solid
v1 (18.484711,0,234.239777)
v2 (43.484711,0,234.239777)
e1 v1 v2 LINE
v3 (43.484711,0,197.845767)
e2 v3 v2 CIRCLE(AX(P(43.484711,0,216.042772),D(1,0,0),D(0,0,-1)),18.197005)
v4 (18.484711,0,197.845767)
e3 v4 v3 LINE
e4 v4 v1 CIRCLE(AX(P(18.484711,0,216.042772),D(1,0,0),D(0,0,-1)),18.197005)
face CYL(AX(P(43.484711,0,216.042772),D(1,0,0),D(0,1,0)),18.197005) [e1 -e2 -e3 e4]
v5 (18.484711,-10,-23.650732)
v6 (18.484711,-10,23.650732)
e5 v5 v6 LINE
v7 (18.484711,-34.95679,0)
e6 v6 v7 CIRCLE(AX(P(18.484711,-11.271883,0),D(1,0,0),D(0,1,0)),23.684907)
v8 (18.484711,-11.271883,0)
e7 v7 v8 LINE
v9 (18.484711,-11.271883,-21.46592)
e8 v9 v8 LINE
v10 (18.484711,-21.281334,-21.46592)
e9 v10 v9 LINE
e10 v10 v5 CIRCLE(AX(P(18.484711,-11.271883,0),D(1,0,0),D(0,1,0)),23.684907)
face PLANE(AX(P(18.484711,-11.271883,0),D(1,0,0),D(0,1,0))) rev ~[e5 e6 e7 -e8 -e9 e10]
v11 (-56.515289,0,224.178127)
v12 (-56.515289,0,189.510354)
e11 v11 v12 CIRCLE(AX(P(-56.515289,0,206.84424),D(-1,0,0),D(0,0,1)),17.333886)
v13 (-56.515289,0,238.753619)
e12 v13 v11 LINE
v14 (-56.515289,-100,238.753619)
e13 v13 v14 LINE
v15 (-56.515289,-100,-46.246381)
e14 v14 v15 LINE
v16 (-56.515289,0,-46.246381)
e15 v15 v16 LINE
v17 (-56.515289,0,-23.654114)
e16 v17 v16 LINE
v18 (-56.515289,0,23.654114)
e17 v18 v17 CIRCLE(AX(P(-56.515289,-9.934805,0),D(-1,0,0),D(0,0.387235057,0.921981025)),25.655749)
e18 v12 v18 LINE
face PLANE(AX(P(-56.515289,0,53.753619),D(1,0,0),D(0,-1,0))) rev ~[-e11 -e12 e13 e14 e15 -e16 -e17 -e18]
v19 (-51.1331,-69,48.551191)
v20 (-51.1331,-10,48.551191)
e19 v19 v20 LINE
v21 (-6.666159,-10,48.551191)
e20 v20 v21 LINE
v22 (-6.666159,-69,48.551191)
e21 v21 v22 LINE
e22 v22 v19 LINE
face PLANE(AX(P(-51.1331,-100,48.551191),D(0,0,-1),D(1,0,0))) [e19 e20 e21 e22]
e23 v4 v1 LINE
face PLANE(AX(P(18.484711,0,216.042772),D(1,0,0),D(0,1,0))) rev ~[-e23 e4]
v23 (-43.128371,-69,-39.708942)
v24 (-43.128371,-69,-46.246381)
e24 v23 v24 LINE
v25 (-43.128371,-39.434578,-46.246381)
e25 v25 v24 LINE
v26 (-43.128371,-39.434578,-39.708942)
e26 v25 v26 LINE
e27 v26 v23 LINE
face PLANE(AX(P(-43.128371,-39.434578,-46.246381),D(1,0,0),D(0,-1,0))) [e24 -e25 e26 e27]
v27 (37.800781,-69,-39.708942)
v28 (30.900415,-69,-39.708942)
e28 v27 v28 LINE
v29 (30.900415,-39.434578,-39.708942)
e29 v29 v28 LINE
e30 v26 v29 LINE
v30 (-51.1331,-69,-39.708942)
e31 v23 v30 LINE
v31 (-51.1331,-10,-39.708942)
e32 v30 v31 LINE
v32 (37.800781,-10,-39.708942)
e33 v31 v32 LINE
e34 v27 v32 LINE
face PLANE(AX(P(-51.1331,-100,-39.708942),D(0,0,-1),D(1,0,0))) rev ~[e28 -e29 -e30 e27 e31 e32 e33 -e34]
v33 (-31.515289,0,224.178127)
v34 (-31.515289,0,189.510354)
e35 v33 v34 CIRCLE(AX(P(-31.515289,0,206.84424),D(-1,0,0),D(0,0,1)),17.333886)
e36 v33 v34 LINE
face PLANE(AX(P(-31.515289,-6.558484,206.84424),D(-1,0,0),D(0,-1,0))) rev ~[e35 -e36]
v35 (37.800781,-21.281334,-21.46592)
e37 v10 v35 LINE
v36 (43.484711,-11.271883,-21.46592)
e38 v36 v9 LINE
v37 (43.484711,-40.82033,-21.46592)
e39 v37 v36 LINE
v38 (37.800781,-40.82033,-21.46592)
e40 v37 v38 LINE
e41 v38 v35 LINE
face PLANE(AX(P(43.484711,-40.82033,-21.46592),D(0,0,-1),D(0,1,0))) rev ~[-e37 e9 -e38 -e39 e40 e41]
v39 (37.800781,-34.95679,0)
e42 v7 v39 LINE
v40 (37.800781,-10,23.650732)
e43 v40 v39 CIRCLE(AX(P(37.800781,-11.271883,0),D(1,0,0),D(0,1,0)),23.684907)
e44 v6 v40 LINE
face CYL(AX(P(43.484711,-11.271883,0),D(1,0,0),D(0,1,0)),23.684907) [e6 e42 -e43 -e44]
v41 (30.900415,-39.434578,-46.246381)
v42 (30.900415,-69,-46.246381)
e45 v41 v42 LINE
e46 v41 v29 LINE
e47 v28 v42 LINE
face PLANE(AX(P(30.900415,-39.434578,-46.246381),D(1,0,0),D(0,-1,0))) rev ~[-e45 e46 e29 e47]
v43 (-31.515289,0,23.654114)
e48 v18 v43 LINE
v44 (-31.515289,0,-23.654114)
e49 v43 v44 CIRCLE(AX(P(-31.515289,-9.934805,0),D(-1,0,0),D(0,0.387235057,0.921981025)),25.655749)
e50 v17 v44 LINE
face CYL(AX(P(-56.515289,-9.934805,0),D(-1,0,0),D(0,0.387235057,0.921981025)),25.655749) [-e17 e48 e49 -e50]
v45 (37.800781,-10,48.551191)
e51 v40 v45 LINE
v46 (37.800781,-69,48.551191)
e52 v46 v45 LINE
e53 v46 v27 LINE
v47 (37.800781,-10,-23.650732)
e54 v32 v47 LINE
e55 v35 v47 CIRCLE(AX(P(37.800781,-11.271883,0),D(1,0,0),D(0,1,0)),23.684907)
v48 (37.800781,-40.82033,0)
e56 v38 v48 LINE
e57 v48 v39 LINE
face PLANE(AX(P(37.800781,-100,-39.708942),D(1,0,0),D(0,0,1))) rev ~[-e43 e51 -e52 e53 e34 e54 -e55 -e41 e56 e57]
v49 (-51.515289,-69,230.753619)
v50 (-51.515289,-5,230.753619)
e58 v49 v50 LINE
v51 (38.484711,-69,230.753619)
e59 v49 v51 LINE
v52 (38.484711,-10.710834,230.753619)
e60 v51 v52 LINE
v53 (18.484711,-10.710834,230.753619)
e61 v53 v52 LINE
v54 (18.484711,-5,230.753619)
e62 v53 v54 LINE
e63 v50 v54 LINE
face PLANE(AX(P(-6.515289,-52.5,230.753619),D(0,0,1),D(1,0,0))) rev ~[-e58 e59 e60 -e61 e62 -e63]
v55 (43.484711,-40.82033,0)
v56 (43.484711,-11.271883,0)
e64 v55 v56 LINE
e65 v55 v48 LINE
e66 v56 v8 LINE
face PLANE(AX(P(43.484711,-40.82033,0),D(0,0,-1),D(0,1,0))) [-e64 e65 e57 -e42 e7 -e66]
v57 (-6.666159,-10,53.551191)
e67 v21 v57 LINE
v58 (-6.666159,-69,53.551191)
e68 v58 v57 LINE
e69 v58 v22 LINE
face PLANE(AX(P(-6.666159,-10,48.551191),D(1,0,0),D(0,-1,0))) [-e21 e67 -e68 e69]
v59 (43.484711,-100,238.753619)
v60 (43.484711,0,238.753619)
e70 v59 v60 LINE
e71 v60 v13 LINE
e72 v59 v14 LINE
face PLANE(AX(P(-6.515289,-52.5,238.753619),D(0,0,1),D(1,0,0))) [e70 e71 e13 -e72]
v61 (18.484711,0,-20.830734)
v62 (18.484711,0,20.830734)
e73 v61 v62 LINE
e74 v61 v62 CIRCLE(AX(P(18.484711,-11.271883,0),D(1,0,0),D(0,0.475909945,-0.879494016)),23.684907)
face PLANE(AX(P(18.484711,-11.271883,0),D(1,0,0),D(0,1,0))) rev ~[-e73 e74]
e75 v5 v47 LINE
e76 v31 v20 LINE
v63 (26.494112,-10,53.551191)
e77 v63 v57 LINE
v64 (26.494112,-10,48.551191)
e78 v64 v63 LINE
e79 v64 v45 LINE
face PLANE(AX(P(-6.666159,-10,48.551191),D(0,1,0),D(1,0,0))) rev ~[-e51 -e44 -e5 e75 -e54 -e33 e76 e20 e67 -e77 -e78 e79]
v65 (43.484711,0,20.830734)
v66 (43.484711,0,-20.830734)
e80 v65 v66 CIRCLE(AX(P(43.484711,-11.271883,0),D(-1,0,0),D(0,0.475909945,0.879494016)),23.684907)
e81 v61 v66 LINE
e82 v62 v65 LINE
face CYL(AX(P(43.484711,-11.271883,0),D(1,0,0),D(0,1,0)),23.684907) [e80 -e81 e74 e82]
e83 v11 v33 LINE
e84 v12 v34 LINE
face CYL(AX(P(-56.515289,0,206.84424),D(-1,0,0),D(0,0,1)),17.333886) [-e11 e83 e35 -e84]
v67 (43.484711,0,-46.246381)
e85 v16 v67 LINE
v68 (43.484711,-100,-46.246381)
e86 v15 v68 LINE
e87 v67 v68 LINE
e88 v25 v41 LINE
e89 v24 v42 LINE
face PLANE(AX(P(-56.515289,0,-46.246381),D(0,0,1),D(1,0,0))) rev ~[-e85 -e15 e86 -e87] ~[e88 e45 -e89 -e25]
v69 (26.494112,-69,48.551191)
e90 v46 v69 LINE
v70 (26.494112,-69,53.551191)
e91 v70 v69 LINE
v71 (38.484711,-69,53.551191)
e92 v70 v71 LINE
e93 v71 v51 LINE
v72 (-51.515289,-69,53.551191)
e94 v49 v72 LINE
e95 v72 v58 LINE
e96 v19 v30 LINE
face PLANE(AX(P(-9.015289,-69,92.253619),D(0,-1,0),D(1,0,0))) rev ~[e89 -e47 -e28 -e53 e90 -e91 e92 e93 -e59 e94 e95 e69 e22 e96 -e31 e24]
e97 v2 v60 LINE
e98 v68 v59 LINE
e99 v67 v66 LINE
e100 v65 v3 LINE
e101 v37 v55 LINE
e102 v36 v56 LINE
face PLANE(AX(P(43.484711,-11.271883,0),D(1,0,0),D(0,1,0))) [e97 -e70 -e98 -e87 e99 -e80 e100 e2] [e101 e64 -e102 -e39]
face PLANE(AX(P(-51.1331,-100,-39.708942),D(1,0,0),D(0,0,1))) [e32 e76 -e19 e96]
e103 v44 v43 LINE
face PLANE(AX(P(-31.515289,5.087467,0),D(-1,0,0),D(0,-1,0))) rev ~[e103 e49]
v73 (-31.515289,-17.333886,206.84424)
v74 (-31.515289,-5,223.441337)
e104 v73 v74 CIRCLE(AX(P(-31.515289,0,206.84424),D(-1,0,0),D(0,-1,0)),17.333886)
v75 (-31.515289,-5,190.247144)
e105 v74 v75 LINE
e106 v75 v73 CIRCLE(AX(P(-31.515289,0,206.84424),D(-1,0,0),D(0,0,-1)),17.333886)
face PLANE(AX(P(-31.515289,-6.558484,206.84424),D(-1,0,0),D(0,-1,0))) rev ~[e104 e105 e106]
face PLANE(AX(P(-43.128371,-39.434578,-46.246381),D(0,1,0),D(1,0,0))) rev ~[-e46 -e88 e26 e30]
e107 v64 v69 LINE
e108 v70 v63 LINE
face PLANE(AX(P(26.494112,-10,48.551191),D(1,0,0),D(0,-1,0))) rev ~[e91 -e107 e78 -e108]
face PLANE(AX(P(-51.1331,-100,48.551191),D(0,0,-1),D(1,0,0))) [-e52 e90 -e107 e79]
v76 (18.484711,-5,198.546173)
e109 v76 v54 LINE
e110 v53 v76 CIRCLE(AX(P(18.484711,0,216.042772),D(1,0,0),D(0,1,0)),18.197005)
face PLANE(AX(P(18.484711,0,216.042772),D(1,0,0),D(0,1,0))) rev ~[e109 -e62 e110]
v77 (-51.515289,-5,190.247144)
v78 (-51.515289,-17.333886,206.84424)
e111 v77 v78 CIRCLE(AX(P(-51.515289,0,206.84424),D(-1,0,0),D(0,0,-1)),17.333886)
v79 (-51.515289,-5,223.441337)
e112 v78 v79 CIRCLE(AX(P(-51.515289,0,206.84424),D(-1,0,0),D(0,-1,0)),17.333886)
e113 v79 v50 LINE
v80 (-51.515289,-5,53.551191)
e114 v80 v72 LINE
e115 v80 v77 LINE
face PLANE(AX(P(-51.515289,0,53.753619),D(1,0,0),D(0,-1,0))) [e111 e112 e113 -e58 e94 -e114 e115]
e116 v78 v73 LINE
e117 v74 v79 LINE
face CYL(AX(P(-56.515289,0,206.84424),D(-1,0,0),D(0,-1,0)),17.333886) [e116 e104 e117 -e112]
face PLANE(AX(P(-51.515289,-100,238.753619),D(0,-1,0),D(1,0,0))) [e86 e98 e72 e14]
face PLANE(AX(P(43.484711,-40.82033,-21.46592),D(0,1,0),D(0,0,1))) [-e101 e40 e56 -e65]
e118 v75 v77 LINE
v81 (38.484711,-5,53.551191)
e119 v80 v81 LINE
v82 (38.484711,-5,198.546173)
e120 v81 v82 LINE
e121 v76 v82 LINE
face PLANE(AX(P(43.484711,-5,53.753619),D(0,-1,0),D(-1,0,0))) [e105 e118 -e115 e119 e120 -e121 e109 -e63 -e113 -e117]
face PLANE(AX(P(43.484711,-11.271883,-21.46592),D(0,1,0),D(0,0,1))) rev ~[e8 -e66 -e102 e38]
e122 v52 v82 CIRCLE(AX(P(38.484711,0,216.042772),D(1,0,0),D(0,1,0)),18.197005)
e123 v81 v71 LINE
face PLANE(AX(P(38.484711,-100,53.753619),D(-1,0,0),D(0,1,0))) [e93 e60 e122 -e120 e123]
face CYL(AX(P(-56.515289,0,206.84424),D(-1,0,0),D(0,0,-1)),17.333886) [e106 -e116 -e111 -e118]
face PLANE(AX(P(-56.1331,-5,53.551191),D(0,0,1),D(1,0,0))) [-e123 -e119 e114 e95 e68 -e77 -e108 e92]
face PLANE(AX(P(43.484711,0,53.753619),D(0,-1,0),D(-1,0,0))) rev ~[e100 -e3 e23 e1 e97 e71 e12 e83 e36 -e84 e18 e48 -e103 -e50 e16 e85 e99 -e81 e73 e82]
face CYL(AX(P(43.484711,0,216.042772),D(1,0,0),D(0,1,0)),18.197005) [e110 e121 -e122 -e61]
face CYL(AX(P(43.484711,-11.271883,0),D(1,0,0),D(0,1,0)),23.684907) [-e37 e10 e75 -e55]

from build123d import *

# Parameters (mm, degrees)
F0_W        = 100
F0_H        = 100
F1_DEPTH    = 100
F2_W        = 88.9338813722
F2_H        = 88.2601328194
F3_DEPTH    = 90
F5_DEPTH    = 185
F6_T        = 5
F6_T3_DEPTH = 100
F6_T5_DEPTH = 98.2601328194
F6_T7_DEPTH = 98.9338813722
F7_W        = 90
F7_H        = 95
F8_DEPTH    = 8
F10_DEPTH   = 25
F11_R       = 23.6849070482
F11_R_2     = 18.1970048193
F12_DEPTH   = 25
F13_W       = 74.0287862718
F13_H       = 40.3192453086
F14_DEPTH   = 9
F15_W       = 33.1602711231
F15_H       = 63.8056004047
F16_DEPTH   = 25
F17_W       = 95
F17_H       = 277
F18_DEPTH   = 31
F19_W       = 29.5484475791
F19_H       = 21.4659199119
F20_DEPTH   = 25


# Not quite as in the source:
# - a shell that OpenCascade refuses in one call is made with other operations: the cavity is built on its own and cut out


with BuildPart() as f1:
    # F0 (on Front) → F1 (new body)
    with BuildSketch(Plane.XZ):
        with Locations((-6.5152887255, 3.7536189136)):
            Rectangle(F0_W, F0_H)
    extrude(amount=F1_DEPTH)

    # F2 (on face) → F3 (cut)
    with BuildSketch(Plane.XZ.offset(100)):
        with Locations((-6.6661592573, 4.4211242348)):
            Rectangle(F2_W, F2_H)
    extrude(amount=-F3_DEPTH, mode=Mode.SUBTRACT)

    # F4 (on face) → F5 (join)
    with BuildSketch(Plane.XY.offset(53.7536189136)):
        Polygon((-56.5152887255, -100), (43.4847112745, -100), (43.4847112745, -33.4126986563), (43.4847112745, 0), (-56.5152887255, 0), align=None)
    extrude(amount=F5_DEPTH)

    # F6: shell of thickness 5, made by hand


with BuildPart() as f6_core1:
    # F6_t2: copy of F1
    add(f1.part)

    # the walls: a layer under each face that stays
    f6_faces = [f6_core1.faces().sort_by_distance(p)[0] for p in [
        (43.4847112745, -50, 96.2536189136),
        (-6.5152887255, 0, 96.2536189136),
        (-56.5152887255, -50, 96.2536189136),
        (-51.1330999434, -55, 4.4211242348),
        (-6.6661592573, -10, 4.4211242348),
        (-6.6661592573, -55, -39.7089421749),
        (37.8007814288, -55, 4.4211242348),
        (-6.6661592573, -55, 48.5511906445),
        (-6.5152887255, -50, -46.2463810864),
    ]]
    thicken(f6_faces, amount=-F6_T, mode=Mode.SUBTRACT)

    # F6_s4 → F6_t3 (cut)
    with BuildSketch(Plane.XZ.offset(5)):
        Polygon((-51.0830999434, 48.5011906445), (-56.1330999434, 48.5511906445), (-56.1330999434, 53.5511906445), (-51.1330999434, 53.5511906445), align=None)
        Polygon((-51.0830999434, -39.6589421749), (-56.1330999434, -39.7089421749), (-56.1330999434, -44.7089421749), (-51.1330999434, -44.7089421749), align=None)
        Polygon((37.7507814288, -39.6589421749), (37.8007814288, -44.7089421749), (42.8007814288, -44.7089421749), (42.8007814288, -39.7089421749), align=None)
        Polygon((37.7507814288, 48.5011906445), (42.8007814288, 48.5511906445), (42.8007814288, 53.5511906445), (37.8007814288, 53.5511906445), align=None)
    extrude(amount=F6_T3_DEPTH, mode=Mode.SUBTRACT)

    # F6_s6 → F6_t5 (cut)
    with BuildSketch(Plane.XY.offset(-44.7089421749)):
        Polygon((-51.0830999434, -10.05), (-56.1330999434, -10), (-56.1330999434, -5), (-51.1330999434, -5), align=None)
        Polygon((37.7507814288, -10.05), (37.8007814288, -5), (42.8007814288, -5), (42.8007814288, -10), align=None)
    extrude(amount=F6_T5_DEPTH, mode=Mode.SUBTRACT)

    # F6_s8 → F6_t7 (cut)
    with BuildSketch(Plane.YZ.offset(-56.1330999434)):
        Polygon((-10.05, 48.5011906445), (-5, 48.5511906445), (-5, 53.5511906445), (-10, 53.5511906445), align=None)
        Polygon((-10.05, -39.6589421749), (-5, -39.7089421749), (-5, -44.7089421749), (-10, -44.7089421749), align=None)
    extrude(amount=F6_T7_DEPTH, mode=Mode.SUBTRACT)


with BuildPart() as f1_1:
    add(f1.part)

    # what is left inside the walls is the cavity
    f6_cavity = [f6_core1.part.solids().sort_by_distance(p)[0] for p in [
        (38.434711, -68.333333, 146.152405),
    ]]
    add(f6_cavity, mode=Mode.SUBTRACT)

    # F7 (on face) → F8 (join)
    with BuildSketch(Plane.XY.offset(238.7536189136)):
        with Locations((-6.5152887255, -52.5)):
            Rectangle(F7_W, F7_H)
    extrude(amount=-F8_DEPTH)

    # F9 (on face) → F10 (join)
    with BuildSketch(Plane(origin=(-56.5152887255, 0, 0), x_dir=(0, -1, 0), z_dir=(-1, 0, 0))):
        with BuildLine():
            ThreePointArc((0, 189.510354193), (12.2569085004, 194.5873319266), (17.333886234, 206.844240427))
            ThreePointArc((17.333886234, 206.844240427), (12.2569085004, 219.1011489274), (0, 224.178126661))
            Line((0, 224.178126661), (0, 189.510354193))
        make_face()
        with BuildLine():
            Line((0, 189.510354193), (0, 224.178126661))
            ThreePointArc((0, 224.178126661), (-17.333886234, 206.844240427), (0, 189.510354193))
        make_face()
        with BuildLine():
            Line((0, -23.6541135693), (0, 23.6541135693))
            ThreePointArc((0, 23.6541135693), (-15.7209434523, 0), (0, -23.6541135693))
        make_face()
    extrude(amount=-F10_DEPTH)

    # F11 (on face) → F12 (join)
    with BuildSketch(Plane.YZ.offset(43.4847112745)):
        with Locations((-11.2718828022, 0)):
            Circle(F11_R)
        with Locations((0, 216.0427719355)):
            Circle(F11_R_2)
    extrude(amount=-F12_DEPTH)

    # F13 (on face) → F14 (cut)
    with BuildSketch(Plane(origin=(0, 0, -46.2463810864), x_dir=(1, 0, 0), z_dir=(0, 0, -1))):
        with Locations((-6.1139781028, 59.594200924)):
            Rectangle(F13_W, F13_H)
    extrude(amount=-F14_DEPTH, mode=Mode.SUBTRACT)

    # F15 (on face) → F16 (cut)
    with BuildSketch(Plane(origin=(0, 0, 48.5511906445), x_dir=(1, 0, 0), z_dir=(0, 0, -1))):
        with Locations((9.9139763042, 41.9028002024)):
            Rectangle(F15_W, F15_H)
    extrude(amount=-F16_DEPTH, mode=Mode.SUBTRACT)

    # F17 (on face) → F18 (join)
    with BuildSketch(Plane.XZ.offset(100)):
        with Locations((-9.0152887255, 92.2536189136)):
            Rectangle(F17_W, F17_H)
    extrude(amount=-F18_DEPTH)

    # F19 (on face) → F20 (cut)
    with BuildSketch(Plane.YZ.offset(43.4847112745)):
        with Locations((-26.0461065918, -10.7329599559)):
            Rectangle(F19_W, F19_H)
    extrude(amount=-F20_DEPTH, mode=Mode.SUBTRACT)


solid = f1_1.part
